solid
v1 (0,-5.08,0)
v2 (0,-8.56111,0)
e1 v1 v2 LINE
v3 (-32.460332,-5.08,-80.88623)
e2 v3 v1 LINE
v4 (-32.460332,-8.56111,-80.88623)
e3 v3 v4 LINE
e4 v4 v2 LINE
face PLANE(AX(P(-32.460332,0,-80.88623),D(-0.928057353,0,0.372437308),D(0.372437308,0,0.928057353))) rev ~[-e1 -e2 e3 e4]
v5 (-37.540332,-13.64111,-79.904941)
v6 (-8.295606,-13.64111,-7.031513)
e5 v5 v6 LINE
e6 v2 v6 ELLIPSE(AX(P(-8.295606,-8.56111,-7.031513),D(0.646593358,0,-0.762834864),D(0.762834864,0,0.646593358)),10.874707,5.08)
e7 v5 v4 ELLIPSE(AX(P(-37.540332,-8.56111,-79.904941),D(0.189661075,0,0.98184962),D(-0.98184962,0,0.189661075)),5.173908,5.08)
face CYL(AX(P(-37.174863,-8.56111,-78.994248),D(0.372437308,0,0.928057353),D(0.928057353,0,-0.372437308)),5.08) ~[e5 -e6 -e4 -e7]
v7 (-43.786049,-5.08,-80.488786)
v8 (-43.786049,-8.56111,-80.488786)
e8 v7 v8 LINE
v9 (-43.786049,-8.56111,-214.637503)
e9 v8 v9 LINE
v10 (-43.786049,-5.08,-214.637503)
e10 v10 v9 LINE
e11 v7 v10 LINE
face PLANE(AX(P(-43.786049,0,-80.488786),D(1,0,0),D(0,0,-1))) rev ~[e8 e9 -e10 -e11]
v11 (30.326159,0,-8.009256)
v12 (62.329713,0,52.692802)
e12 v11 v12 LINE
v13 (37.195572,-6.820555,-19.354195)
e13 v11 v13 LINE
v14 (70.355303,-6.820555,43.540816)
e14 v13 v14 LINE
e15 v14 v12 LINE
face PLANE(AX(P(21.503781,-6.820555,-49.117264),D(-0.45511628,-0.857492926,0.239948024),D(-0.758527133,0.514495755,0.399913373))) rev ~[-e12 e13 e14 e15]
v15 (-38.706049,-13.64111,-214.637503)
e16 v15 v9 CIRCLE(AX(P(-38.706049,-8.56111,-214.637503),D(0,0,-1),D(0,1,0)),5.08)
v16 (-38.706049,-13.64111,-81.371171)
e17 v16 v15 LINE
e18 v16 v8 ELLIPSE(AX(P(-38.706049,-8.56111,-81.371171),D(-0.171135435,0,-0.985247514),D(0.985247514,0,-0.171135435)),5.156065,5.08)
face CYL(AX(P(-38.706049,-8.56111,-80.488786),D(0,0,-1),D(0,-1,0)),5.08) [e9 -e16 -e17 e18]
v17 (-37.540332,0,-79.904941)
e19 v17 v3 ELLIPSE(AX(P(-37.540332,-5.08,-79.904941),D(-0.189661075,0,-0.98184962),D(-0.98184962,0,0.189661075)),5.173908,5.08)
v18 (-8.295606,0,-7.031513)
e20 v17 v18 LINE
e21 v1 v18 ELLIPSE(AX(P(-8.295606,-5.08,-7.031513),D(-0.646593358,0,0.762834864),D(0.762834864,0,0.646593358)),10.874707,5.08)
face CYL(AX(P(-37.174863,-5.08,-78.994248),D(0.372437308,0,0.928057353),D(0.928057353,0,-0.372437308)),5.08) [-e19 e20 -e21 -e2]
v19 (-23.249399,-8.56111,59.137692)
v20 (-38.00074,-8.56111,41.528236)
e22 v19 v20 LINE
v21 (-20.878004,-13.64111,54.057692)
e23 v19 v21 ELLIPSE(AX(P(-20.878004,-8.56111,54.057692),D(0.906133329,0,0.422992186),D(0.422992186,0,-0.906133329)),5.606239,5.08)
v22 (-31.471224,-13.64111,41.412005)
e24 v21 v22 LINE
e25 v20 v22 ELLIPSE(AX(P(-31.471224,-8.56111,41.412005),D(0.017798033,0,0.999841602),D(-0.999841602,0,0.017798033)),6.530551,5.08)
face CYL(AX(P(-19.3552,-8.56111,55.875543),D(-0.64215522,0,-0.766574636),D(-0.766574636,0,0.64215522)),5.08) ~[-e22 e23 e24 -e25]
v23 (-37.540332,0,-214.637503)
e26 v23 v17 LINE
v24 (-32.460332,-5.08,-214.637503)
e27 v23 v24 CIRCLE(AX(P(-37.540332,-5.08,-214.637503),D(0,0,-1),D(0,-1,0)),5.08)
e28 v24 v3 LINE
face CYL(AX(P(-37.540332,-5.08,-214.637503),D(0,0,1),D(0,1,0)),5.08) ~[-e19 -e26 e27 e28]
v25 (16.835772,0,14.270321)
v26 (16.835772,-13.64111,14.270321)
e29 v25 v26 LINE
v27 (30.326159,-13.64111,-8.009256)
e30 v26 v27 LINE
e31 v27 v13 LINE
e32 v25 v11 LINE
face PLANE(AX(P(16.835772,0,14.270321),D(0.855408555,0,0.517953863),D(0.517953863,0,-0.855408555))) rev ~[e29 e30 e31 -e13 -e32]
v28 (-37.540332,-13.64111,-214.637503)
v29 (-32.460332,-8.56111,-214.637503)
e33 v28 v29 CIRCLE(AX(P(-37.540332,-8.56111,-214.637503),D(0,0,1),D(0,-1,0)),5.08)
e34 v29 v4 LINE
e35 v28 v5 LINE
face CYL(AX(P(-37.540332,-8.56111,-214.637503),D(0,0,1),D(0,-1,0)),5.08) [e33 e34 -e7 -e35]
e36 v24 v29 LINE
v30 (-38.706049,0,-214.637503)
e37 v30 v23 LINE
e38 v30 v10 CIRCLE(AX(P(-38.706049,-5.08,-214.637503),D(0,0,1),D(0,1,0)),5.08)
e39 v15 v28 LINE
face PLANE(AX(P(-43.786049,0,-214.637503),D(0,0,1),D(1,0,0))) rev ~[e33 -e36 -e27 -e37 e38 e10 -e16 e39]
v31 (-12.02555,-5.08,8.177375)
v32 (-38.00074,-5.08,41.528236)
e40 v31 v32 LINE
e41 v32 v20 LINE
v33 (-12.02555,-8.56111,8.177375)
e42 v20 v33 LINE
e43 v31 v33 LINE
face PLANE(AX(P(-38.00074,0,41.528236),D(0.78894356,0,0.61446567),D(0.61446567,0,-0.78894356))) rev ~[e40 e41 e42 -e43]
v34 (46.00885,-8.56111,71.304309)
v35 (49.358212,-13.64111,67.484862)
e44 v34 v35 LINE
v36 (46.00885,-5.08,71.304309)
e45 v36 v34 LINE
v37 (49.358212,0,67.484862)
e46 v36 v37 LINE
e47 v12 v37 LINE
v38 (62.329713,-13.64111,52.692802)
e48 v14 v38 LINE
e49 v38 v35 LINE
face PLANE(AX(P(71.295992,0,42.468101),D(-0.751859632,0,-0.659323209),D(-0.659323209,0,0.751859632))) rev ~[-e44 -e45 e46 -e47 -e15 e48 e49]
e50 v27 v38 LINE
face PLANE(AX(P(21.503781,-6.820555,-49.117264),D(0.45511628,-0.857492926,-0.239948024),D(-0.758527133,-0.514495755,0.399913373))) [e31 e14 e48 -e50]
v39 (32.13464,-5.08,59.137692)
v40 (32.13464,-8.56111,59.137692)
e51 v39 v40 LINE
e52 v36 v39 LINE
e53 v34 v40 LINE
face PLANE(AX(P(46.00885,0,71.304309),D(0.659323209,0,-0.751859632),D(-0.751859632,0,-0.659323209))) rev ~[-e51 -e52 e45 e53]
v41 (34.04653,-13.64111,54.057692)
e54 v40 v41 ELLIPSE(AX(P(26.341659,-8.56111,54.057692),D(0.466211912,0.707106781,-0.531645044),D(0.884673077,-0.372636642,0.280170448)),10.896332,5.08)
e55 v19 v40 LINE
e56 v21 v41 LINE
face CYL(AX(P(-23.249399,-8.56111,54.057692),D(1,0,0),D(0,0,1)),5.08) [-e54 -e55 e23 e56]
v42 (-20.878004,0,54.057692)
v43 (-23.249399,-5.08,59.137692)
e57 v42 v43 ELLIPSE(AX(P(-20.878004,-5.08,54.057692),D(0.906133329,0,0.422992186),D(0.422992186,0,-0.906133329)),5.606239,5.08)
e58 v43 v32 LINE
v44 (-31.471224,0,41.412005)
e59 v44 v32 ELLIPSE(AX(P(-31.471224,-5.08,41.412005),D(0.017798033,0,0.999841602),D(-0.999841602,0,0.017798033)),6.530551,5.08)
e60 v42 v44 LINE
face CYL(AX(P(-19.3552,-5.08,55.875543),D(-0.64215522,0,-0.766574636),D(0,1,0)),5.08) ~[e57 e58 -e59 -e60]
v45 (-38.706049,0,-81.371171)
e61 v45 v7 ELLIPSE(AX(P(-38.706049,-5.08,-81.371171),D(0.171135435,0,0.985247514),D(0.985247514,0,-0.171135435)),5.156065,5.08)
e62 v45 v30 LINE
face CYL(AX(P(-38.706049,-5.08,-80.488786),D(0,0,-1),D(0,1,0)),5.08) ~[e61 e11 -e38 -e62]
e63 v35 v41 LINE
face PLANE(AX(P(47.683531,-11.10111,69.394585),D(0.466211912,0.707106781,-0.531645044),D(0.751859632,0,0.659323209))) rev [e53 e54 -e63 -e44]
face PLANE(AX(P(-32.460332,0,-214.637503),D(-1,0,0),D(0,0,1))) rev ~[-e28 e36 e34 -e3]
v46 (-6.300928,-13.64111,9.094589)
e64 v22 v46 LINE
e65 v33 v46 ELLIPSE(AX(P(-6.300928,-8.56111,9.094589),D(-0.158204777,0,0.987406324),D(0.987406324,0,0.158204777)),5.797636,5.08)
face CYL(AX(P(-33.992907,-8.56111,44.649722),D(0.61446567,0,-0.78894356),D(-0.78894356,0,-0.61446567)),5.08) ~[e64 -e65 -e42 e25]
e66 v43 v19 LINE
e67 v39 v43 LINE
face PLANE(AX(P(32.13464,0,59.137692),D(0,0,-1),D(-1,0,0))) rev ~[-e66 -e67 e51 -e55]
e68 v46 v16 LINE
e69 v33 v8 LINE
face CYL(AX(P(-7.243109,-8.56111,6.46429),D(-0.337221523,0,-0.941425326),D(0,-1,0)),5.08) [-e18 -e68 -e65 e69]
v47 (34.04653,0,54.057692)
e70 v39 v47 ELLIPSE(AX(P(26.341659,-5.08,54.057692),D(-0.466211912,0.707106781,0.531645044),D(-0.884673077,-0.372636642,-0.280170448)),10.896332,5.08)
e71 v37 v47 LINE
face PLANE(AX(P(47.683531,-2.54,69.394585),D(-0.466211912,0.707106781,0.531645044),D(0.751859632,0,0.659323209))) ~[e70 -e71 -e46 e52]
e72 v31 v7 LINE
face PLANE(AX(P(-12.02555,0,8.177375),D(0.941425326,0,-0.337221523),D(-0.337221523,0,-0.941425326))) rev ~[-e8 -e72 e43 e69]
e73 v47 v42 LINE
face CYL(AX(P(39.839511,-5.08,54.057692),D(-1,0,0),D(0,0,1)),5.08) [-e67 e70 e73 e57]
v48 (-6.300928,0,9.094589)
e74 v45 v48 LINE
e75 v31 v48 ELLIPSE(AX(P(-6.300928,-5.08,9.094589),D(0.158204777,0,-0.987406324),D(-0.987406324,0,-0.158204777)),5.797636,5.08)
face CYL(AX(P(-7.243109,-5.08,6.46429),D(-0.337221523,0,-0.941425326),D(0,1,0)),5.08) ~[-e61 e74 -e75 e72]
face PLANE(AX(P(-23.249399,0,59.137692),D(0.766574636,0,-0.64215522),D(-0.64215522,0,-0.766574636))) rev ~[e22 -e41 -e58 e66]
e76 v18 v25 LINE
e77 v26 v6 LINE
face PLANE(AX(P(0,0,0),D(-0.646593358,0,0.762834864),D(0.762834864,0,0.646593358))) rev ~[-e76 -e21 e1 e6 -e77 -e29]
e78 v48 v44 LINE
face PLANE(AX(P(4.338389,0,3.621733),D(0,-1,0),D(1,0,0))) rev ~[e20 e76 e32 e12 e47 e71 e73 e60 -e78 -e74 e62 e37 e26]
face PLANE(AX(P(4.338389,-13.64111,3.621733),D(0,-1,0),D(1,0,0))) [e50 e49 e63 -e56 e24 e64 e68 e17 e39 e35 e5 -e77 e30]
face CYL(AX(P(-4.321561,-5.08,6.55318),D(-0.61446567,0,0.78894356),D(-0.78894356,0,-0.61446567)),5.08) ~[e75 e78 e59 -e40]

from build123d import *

# Parameters (mm, degrees)
F1_DEPTH    = 13.64111
F2_T1_DEPTH = 137.0825914491
F3_R        = 5.08
F4_SIZE     = 5.08
F5_R        = 5.08


# Not quite as in the source:
# - a fillet or chamfer that OpenCascade refuses, or shapes differently, is made with other operations: its cross-section is extruded or revolved along the edge and cut away or added


with BuildPart() as f1:
    # F0 (on Front) → F1 (new body)
    with BuildSketch(Plane.XZ):
        Polygon((0, 0), (16.8357715011, 14.2703205347), (38.0007438362, -20.6839479506), (71.29599154, 42.4681007862), (46.0088496082, 71.3043088503), (32.1346404756, 59.1376919794), (-23.249398917, 59.1376919794), (-38.0007401109, 41.5282361209), (-12.0255500078, 8.1773754209), (-43.7860488892, -80.4887861013), (-32.4603319168, -80.8862298727), align=None)
        Polygon((-32.4603319168, -214.6375030279), (-32.4603319168, -80.8862298727), (-43.7860488892, -80.4887861013), (-43.7860488892, -214.6375030279), align=None)
    extrude(amount=F1_DEPTH)

    # F2: chamfer of 7.62 x 12.7 on 2 edges, made by hand

    # F2_s2 → F2_t1 (cut)
    with BuildSketch(Plane(origin=(-15.5861012637, 0, -29.5626041102), x_dir=(0, 1, 0), z_dir=(0.4663751275, 0, 0.8845870451))):
        Polygon((-6.02111, -43.2614445663), (-13.64111, -30.5614445663), (-13.64111, -43.2614445663), align=None)
        Polygon((-7.62, -43.2614445663), (0, -30.5614445663), (0, -43.2614445663), align=None)
    extrude(amount=F2_T1_DEPTH, mode=Mode.SUBTRACT)

    # F3
    f3_edges = [f1.edges().sort_by_distance(p)[0] for p in [
        (-32.460332, -13.64111, -147.761866),
        (-32.460332, 0, -147.761866),
        (-43.786049, -13.64111, -147.563145),
        (-43.786049, 0, -147.563145),
        (-16.230166, -13.64111, -40.443115),
        (-27.905799, -13.64111, -36.155705),
        (-27.905799, 0, -36.155705),
        (-16.230166, 0, -40.443115),
    ]]
    fillet(f3_edges, radius=F3_R)

    # F4
    f4_edges = [f1.edges().sort_by_distance(p)[0] for p in [
        (39.071745, -13.64111, 65.221),
        (39.071745, 0, 65.221),
    ]]
    chamfer(f4_edges, length=F4_SIZE)

    # F5
    f5_edges = [f1.edges().sort_by_distance(p)[0] for p in [
        (-30.62507, -13.64111, 50.332964),
        (-30.62507, 0, 50.332964),
        (-25.013145, 0, 24.852806),
        (-25.013145, -13.64111, 24.852806),
        (4.442621, -13.64111, 59.137692),
        (4.442621, 0, 59.137692),
    ]]
    fillet(f5_edges, radius=F5_R)


solid = f1.part
